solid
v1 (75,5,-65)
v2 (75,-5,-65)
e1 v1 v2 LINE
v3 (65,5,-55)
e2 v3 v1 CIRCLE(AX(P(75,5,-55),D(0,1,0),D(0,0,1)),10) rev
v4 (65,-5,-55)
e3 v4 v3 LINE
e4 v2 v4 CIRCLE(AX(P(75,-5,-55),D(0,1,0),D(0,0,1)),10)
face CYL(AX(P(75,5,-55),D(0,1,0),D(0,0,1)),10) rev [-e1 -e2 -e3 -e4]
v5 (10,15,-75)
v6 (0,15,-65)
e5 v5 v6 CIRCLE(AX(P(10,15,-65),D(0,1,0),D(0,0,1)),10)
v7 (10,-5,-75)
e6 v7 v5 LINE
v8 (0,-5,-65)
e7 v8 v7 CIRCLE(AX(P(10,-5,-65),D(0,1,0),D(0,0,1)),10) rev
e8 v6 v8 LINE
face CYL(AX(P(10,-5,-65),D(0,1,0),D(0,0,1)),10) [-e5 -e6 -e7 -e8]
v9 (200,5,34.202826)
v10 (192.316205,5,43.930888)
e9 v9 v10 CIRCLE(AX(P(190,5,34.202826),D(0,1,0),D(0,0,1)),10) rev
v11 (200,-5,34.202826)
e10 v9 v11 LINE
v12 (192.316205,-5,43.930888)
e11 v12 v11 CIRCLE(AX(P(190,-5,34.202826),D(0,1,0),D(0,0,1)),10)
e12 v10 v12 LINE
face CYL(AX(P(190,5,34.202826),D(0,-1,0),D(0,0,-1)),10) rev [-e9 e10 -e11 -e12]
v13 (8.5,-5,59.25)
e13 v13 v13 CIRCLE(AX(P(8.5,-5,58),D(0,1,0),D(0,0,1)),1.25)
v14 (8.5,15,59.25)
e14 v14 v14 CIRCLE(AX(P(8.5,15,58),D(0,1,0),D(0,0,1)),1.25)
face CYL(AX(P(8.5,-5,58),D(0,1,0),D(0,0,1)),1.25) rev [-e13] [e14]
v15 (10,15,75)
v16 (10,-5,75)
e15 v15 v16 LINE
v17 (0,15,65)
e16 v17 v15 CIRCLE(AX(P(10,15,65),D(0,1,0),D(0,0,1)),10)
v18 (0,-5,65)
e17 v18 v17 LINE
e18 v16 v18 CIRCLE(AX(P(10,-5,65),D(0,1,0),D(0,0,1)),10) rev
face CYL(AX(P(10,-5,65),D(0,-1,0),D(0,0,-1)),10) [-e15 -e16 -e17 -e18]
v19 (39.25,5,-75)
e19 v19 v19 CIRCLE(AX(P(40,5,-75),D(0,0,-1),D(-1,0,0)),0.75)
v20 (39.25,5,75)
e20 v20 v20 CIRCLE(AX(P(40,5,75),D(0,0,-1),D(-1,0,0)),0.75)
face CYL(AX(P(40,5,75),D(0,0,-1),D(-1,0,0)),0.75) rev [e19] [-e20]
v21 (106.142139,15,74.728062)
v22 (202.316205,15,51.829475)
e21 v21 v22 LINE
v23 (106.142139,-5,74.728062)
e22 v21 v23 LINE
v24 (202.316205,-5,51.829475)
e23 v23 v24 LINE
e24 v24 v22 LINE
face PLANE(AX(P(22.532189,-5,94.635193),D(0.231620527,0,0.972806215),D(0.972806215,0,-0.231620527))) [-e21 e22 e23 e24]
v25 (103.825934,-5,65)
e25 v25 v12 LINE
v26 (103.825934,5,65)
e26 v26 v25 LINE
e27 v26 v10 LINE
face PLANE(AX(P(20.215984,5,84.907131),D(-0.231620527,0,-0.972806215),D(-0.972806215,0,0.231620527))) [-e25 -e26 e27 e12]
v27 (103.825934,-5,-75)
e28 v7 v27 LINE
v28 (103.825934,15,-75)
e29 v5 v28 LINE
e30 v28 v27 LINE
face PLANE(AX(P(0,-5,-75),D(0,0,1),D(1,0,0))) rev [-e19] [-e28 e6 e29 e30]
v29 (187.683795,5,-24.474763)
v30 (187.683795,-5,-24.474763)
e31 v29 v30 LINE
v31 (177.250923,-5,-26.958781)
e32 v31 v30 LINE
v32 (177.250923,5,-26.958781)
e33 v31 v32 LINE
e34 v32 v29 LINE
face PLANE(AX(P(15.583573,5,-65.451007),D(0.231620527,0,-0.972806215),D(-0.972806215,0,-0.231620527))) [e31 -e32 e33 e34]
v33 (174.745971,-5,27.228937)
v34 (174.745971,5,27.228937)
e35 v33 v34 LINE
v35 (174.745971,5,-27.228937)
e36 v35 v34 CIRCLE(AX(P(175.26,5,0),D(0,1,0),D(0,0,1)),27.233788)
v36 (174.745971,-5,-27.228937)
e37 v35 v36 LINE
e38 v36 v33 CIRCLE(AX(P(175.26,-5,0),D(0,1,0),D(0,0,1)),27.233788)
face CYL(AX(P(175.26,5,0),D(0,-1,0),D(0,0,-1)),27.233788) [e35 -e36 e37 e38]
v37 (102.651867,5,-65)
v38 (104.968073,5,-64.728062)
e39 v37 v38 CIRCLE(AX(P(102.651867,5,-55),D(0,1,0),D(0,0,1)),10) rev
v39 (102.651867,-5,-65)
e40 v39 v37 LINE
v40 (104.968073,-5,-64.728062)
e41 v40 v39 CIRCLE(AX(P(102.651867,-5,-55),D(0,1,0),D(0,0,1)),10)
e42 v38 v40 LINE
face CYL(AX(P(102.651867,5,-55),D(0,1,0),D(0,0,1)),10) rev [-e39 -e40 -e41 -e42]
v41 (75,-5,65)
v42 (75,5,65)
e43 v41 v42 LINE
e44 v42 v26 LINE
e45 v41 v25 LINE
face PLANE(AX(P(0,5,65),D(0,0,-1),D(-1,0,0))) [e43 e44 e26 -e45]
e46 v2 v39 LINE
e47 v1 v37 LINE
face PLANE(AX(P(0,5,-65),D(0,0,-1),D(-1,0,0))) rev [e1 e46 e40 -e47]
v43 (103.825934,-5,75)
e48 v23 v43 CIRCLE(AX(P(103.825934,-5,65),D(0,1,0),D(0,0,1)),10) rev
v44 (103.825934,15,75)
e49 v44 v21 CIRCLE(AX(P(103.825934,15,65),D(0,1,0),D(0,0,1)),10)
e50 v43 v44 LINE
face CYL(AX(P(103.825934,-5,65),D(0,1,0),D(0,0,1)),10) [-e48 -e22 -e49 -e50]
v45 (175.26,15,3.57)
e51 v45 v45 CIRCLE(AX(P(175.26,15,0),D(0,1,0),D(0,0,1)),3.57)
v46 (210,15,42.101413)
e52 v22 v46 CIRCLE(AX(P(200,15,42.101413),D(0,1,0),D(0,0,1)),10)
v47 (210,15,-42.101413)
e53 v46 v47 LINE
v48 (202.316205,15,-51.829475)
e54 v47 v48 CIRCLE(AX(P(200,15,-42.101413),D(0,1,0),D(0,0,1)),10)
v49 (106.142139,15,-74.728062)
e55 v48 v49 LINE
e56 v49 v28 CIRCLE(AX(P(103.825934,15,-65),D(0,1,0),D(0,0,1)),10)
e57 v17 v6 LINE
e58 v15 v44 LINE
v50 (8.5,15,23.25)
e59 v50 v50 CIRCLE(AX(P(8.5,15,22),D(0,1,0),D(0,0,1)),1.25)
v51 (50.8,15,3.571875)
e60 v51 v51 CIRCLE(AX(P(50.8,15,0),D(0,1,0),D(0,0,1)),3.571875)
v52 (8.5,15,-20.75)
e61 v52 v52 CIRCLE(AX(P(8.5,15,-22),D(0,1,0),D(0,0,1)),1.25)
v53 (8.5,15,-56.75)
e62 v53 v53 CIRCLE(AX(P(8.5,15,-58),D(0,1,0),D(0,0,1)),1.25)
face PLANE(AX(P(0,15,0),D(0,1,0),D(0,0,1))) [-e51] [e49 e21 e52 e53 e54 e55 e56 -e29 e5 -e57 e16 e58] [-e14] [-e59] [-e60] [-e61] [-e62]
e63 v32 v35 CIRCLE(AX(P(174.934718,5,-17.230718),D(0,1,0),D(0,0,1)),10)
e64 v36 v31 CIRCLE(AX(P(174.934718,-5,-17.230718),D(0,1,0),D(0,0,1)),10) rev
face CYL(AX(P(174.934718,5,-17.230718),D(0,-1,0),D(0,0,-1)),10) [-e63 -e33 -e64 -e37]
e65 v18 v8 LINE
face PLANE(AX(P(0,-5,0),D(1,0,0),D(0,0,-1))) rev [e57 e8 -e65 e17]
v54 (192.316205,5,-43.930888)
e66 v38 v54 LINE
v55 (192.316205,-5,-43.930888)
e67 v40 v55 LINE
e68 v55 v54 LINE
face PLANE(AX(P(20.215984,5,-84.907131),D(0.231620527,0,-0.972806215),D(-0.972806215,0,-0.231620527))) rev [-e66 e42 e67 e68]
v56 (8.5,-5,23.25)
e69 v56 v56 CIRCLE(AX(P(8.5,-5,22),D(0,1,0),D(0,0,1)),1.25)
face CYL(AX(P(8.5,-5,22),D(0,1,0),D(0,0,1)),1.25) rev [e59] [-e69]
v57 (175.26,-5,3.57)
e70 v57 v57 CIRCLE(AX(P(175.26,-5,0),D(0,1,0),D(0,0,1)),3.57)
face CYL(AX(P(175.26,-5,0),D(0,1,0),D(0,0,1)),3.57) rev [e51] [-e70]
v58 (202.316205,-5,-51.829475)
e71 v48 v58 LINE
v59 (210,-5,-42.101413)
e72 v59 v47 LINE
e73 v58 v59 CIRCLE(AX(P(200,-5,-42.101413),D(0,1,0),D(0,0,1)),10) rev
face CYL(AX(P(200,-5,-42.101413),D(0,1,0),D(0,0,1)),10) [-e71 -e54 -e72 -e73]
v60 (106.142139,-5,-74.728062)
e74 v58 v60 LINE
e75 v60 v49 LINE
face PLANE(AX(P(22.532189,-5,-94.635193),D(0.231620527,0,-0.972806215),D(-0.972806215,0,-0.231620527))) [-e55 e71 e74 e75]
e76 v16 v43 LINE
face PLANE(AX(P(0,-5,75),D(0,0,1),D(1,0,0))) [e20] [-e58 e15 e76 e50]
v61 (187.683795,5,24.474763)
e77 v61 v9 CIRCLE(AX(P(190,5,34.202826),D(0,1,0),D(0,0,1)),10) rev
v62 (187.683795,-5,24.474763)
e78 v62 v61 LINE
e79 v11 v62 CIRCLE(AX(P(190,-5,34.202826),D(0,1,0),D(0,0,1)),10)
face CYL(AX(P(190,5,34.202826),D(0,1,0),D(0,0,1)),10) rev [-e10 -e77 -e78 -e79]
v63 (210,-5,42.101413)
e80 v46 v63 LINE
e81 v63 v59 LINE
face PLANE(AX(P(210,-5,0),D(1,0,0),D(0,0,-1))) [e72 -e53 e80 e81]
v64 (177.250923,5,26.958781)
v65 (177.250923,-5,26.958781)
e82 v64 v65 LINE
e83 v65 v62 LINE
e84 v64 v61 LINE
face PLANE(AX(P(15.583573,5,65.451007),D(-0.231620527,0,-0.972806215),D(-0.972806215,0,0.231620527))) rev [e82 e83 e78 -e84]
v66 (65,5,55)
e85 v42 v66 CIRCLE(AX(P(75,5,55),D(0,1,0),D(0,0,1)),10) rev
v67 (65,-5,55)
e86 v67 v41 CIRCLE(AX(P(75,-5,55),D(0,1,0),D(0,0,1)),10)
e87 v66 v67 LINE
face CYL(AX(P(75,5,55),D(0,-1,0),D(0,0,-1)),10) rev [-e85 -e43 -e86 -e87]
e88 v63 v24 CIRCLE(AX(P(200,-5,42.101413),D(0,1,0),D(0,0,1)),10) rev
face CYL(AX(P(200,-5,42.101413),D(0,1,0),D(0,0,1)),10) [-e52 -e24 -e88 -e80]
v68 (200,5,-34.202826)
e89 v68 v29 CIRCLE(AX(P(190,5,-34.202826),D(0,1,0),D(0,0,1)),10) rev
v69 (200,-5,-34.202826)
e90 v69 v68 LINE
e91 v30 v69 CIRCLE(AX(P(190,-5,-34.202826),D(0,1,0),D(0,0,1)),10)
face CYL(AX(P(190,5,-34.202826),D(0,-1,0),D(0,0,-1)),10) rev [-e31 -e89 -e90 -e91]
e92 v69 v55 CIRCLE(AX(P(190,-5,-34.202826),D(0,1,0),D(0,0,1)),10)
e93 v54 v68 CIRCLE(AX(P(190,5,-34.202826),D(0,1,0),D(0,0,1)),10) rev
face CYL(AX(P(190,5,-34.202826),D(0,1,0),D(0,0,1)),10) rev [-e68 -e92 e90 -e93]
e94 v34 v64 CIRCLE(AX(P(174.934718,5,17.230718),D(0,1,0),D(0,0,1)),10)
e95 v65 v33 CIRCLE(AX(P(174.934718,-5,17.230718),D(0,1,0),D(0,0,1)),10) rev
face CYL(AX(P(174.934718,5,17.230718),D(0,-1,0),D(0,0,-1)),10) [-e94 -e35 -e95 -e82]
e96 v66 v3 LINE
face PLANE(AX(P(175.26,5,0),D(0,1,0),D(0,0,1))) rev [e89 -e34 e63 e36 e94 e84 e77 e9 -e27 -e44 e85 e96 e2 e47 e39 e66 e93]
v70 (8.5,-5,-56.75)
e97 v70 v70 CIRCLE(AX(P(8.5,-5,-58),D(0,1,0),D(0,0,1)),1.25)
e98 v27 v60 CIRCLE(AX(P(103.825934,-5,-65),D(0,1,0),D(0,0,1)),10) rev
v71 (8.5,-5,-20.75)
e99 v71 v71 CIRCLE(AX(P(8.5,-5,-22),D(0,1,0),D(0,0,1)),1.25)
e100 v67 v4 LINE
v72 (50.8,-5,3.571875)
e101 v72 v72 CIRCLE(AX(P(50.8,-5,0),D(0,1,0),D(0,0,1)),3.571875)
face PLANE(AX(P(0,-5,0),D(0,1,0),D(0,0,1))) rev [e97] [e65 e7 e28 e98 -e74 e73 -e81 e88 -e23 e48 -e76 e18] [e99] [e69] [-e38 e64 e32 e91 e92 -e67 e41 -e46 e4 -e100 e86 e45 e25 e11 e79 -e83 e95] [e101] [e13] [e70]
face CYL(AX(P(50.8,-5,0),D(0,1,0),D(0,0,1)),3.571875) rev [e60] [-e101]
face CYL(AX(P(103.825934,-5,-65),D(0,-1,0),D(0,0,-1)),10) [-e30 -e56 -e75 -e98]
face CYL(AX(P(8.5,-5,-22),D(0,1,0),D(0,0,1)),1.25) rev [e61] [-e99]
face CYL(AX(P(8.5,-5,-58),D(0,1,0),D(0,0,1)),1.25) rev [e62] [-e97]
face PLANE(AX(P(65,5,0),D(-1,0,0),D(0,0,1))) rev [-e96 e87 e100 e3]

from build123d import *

# Parameters (mm, degrees)
RESSALTO_EXTRUS_O1_DEPTH      = 15
RESSALTO_EXTRUS_O1_DEPTH_BACK = 5
ESBO_O1_R                     = 3.571875
ESBO_O1_R_2                   = 3.57
ESBO_O1_R_3                   = 1.25
FILETE1_R                     = 10
CORTE_EXTRUS_O2_START         = -20
CORTE_EXTRUS_O2_DEPTH         = 10
FILETE2_R                     = 10
ESBO_O7_R                     = 0.75
CORTE_EXTRUS_O3_DEPTH         = 259.505319094


with BuildPart() as part:
    # Esboço1 → Ressalto-extrusão1 (new, two sides: drawn at the far end of the back side and taken through both)
    with BuildSketch(Plane(origin=(0, 0, 0), x_dir=(1, 0, 0), z_dir=(0, 1, 0)).offset(-RESSALTO_EXTRUS_O1_DEPTH_BACK)):
        Polygon((210, 50), (105, 75), (0, 75), (0, -75), (105, -75), (210, -50), align=None)
        with Locations(Location((50.8, 0, 0), (0, 0, 270))):
            Circle(ESBO_O1_R, mode=Mode.SUBTRACT)
        with Locations(Location((175.26, 0, 0), (0, 0, 270))):
            Circle(ESBO_O1_R_2, mode=Mode.SUBTRACT)
        with Locations(Location((8.5, -58, 0), (0, 0, 270))):
            Circle(ESBO_O1_R_3, mode=Mode.SUBTRACT)
        with Locations(Location((8.5, -22, 0), (0, 0, 270))):
            Circle(ESBO_O1_R_3, mode=Mode.SUBTRACT)
        with Locations(Location((8.5, 22, 0), (0, 0, 270))):
            Circle(ESBO_O1_R_3, mode=Mode.SUBTRACT)
        with Locations(Location((8.5, 58, 0), (0, 0, 270))):
            Circle(ESBO_O1_R_3, mode=Mode.SUBTRACT)
    extrude(amount=RESSALTO_EXTRUS_O1_DEPTH + RESSALTO_EXTRUS_O1_DEPTH_BACK)

    # Filete1
    filete1_edges = [part.edges().sort_by_distance(p)[0] for p in [
        (0, 5, 75),
        (0, 5, -75),
        (105, 5, -75),
        (210, 5, -50),
        (210, 5, 50),
        (105, 5, 75),
    ]]
    fillet(filete1_edges, radius=FILETE1_R)

    # Esboço6 → Corte-extrusão2 (cut)
    with BuildSketch(Plane(origin=(0, 15, 0), x_dir=(1, 0, 0), z_dir=(0, 1, 0)).offset(CORTE_EXTRUS_O2_START)):
        with BuildLine():
            Line((200, 21.542333602), (200, 42.101412788))
            Line((200, 42.101412788), (103.82593371, 65))
            Line((103.82593371, 65), (65, 65))
            Line((65, 65), (65, 0))
            Line((65, 0), (148.026211544, 0))
            ThreePointArc((148.026211544, 0), (156.322992627, 19.572148207), (176.158102637, 27.218975832))
            Line((176.158102637, 27.218975832), (200, 21.542333602))
        make_face()
        with BuildLine():
            Line((200, -42.101412788), (200, -21.542333602))
            Line((200, -21.542333602), (176.158102637, -27.218975832))
            ThreePointArc((176.158102637, -27.218975832), (156.322992627, -19.572148207), (148.026211544, 0))
            Line((148.026211544, 0), (65, 0))
            Line((65, 0), (65, -65))
            Line((65, -65), (103.82593371, -65))
            Line((103.82593371, -65), (200, -42.101412788))
        make_face()
    extrude(amount=CORTE_EXTRUS_O2_DEPTH, mode=Mode.SUBTRACT)

    # Filete2
    filete2_edges = [part.edges().sort_by_distance(p)[0] for p in [
        (65, 0, 65),
        (65, 0, -65),
        (103.82593371, 0, -65),
        (200, 0, -21.542333602),
        (176.158102637, 0, -27.218975832),
        (200, 0, -42.101412788),
        (200, 0, 42.101412788),
        (176.158102637, 0, 27.218975832),
        (200, 0, 21.542333602),
    ]]
    fillet(filete2_edges, radius=FILETE2_R - 0.0001)  # a hair under: the kernel refuses the full size

    # Esboço7 → Corte-extrusão3 (cut, through all)
    with BuildSketch(Plane(origin=(0, 0, -75), x_dir=(-1, 0, 0), z_dir=(0, 0, -1))):
        with Locations((-40, 5)):
            Circle(ESBO_O7_R)
    extrude(amount=-CORTE_EXTRUS_O3_DEPTH, mode=Mode.SUBTRACT)


solid = part.part
